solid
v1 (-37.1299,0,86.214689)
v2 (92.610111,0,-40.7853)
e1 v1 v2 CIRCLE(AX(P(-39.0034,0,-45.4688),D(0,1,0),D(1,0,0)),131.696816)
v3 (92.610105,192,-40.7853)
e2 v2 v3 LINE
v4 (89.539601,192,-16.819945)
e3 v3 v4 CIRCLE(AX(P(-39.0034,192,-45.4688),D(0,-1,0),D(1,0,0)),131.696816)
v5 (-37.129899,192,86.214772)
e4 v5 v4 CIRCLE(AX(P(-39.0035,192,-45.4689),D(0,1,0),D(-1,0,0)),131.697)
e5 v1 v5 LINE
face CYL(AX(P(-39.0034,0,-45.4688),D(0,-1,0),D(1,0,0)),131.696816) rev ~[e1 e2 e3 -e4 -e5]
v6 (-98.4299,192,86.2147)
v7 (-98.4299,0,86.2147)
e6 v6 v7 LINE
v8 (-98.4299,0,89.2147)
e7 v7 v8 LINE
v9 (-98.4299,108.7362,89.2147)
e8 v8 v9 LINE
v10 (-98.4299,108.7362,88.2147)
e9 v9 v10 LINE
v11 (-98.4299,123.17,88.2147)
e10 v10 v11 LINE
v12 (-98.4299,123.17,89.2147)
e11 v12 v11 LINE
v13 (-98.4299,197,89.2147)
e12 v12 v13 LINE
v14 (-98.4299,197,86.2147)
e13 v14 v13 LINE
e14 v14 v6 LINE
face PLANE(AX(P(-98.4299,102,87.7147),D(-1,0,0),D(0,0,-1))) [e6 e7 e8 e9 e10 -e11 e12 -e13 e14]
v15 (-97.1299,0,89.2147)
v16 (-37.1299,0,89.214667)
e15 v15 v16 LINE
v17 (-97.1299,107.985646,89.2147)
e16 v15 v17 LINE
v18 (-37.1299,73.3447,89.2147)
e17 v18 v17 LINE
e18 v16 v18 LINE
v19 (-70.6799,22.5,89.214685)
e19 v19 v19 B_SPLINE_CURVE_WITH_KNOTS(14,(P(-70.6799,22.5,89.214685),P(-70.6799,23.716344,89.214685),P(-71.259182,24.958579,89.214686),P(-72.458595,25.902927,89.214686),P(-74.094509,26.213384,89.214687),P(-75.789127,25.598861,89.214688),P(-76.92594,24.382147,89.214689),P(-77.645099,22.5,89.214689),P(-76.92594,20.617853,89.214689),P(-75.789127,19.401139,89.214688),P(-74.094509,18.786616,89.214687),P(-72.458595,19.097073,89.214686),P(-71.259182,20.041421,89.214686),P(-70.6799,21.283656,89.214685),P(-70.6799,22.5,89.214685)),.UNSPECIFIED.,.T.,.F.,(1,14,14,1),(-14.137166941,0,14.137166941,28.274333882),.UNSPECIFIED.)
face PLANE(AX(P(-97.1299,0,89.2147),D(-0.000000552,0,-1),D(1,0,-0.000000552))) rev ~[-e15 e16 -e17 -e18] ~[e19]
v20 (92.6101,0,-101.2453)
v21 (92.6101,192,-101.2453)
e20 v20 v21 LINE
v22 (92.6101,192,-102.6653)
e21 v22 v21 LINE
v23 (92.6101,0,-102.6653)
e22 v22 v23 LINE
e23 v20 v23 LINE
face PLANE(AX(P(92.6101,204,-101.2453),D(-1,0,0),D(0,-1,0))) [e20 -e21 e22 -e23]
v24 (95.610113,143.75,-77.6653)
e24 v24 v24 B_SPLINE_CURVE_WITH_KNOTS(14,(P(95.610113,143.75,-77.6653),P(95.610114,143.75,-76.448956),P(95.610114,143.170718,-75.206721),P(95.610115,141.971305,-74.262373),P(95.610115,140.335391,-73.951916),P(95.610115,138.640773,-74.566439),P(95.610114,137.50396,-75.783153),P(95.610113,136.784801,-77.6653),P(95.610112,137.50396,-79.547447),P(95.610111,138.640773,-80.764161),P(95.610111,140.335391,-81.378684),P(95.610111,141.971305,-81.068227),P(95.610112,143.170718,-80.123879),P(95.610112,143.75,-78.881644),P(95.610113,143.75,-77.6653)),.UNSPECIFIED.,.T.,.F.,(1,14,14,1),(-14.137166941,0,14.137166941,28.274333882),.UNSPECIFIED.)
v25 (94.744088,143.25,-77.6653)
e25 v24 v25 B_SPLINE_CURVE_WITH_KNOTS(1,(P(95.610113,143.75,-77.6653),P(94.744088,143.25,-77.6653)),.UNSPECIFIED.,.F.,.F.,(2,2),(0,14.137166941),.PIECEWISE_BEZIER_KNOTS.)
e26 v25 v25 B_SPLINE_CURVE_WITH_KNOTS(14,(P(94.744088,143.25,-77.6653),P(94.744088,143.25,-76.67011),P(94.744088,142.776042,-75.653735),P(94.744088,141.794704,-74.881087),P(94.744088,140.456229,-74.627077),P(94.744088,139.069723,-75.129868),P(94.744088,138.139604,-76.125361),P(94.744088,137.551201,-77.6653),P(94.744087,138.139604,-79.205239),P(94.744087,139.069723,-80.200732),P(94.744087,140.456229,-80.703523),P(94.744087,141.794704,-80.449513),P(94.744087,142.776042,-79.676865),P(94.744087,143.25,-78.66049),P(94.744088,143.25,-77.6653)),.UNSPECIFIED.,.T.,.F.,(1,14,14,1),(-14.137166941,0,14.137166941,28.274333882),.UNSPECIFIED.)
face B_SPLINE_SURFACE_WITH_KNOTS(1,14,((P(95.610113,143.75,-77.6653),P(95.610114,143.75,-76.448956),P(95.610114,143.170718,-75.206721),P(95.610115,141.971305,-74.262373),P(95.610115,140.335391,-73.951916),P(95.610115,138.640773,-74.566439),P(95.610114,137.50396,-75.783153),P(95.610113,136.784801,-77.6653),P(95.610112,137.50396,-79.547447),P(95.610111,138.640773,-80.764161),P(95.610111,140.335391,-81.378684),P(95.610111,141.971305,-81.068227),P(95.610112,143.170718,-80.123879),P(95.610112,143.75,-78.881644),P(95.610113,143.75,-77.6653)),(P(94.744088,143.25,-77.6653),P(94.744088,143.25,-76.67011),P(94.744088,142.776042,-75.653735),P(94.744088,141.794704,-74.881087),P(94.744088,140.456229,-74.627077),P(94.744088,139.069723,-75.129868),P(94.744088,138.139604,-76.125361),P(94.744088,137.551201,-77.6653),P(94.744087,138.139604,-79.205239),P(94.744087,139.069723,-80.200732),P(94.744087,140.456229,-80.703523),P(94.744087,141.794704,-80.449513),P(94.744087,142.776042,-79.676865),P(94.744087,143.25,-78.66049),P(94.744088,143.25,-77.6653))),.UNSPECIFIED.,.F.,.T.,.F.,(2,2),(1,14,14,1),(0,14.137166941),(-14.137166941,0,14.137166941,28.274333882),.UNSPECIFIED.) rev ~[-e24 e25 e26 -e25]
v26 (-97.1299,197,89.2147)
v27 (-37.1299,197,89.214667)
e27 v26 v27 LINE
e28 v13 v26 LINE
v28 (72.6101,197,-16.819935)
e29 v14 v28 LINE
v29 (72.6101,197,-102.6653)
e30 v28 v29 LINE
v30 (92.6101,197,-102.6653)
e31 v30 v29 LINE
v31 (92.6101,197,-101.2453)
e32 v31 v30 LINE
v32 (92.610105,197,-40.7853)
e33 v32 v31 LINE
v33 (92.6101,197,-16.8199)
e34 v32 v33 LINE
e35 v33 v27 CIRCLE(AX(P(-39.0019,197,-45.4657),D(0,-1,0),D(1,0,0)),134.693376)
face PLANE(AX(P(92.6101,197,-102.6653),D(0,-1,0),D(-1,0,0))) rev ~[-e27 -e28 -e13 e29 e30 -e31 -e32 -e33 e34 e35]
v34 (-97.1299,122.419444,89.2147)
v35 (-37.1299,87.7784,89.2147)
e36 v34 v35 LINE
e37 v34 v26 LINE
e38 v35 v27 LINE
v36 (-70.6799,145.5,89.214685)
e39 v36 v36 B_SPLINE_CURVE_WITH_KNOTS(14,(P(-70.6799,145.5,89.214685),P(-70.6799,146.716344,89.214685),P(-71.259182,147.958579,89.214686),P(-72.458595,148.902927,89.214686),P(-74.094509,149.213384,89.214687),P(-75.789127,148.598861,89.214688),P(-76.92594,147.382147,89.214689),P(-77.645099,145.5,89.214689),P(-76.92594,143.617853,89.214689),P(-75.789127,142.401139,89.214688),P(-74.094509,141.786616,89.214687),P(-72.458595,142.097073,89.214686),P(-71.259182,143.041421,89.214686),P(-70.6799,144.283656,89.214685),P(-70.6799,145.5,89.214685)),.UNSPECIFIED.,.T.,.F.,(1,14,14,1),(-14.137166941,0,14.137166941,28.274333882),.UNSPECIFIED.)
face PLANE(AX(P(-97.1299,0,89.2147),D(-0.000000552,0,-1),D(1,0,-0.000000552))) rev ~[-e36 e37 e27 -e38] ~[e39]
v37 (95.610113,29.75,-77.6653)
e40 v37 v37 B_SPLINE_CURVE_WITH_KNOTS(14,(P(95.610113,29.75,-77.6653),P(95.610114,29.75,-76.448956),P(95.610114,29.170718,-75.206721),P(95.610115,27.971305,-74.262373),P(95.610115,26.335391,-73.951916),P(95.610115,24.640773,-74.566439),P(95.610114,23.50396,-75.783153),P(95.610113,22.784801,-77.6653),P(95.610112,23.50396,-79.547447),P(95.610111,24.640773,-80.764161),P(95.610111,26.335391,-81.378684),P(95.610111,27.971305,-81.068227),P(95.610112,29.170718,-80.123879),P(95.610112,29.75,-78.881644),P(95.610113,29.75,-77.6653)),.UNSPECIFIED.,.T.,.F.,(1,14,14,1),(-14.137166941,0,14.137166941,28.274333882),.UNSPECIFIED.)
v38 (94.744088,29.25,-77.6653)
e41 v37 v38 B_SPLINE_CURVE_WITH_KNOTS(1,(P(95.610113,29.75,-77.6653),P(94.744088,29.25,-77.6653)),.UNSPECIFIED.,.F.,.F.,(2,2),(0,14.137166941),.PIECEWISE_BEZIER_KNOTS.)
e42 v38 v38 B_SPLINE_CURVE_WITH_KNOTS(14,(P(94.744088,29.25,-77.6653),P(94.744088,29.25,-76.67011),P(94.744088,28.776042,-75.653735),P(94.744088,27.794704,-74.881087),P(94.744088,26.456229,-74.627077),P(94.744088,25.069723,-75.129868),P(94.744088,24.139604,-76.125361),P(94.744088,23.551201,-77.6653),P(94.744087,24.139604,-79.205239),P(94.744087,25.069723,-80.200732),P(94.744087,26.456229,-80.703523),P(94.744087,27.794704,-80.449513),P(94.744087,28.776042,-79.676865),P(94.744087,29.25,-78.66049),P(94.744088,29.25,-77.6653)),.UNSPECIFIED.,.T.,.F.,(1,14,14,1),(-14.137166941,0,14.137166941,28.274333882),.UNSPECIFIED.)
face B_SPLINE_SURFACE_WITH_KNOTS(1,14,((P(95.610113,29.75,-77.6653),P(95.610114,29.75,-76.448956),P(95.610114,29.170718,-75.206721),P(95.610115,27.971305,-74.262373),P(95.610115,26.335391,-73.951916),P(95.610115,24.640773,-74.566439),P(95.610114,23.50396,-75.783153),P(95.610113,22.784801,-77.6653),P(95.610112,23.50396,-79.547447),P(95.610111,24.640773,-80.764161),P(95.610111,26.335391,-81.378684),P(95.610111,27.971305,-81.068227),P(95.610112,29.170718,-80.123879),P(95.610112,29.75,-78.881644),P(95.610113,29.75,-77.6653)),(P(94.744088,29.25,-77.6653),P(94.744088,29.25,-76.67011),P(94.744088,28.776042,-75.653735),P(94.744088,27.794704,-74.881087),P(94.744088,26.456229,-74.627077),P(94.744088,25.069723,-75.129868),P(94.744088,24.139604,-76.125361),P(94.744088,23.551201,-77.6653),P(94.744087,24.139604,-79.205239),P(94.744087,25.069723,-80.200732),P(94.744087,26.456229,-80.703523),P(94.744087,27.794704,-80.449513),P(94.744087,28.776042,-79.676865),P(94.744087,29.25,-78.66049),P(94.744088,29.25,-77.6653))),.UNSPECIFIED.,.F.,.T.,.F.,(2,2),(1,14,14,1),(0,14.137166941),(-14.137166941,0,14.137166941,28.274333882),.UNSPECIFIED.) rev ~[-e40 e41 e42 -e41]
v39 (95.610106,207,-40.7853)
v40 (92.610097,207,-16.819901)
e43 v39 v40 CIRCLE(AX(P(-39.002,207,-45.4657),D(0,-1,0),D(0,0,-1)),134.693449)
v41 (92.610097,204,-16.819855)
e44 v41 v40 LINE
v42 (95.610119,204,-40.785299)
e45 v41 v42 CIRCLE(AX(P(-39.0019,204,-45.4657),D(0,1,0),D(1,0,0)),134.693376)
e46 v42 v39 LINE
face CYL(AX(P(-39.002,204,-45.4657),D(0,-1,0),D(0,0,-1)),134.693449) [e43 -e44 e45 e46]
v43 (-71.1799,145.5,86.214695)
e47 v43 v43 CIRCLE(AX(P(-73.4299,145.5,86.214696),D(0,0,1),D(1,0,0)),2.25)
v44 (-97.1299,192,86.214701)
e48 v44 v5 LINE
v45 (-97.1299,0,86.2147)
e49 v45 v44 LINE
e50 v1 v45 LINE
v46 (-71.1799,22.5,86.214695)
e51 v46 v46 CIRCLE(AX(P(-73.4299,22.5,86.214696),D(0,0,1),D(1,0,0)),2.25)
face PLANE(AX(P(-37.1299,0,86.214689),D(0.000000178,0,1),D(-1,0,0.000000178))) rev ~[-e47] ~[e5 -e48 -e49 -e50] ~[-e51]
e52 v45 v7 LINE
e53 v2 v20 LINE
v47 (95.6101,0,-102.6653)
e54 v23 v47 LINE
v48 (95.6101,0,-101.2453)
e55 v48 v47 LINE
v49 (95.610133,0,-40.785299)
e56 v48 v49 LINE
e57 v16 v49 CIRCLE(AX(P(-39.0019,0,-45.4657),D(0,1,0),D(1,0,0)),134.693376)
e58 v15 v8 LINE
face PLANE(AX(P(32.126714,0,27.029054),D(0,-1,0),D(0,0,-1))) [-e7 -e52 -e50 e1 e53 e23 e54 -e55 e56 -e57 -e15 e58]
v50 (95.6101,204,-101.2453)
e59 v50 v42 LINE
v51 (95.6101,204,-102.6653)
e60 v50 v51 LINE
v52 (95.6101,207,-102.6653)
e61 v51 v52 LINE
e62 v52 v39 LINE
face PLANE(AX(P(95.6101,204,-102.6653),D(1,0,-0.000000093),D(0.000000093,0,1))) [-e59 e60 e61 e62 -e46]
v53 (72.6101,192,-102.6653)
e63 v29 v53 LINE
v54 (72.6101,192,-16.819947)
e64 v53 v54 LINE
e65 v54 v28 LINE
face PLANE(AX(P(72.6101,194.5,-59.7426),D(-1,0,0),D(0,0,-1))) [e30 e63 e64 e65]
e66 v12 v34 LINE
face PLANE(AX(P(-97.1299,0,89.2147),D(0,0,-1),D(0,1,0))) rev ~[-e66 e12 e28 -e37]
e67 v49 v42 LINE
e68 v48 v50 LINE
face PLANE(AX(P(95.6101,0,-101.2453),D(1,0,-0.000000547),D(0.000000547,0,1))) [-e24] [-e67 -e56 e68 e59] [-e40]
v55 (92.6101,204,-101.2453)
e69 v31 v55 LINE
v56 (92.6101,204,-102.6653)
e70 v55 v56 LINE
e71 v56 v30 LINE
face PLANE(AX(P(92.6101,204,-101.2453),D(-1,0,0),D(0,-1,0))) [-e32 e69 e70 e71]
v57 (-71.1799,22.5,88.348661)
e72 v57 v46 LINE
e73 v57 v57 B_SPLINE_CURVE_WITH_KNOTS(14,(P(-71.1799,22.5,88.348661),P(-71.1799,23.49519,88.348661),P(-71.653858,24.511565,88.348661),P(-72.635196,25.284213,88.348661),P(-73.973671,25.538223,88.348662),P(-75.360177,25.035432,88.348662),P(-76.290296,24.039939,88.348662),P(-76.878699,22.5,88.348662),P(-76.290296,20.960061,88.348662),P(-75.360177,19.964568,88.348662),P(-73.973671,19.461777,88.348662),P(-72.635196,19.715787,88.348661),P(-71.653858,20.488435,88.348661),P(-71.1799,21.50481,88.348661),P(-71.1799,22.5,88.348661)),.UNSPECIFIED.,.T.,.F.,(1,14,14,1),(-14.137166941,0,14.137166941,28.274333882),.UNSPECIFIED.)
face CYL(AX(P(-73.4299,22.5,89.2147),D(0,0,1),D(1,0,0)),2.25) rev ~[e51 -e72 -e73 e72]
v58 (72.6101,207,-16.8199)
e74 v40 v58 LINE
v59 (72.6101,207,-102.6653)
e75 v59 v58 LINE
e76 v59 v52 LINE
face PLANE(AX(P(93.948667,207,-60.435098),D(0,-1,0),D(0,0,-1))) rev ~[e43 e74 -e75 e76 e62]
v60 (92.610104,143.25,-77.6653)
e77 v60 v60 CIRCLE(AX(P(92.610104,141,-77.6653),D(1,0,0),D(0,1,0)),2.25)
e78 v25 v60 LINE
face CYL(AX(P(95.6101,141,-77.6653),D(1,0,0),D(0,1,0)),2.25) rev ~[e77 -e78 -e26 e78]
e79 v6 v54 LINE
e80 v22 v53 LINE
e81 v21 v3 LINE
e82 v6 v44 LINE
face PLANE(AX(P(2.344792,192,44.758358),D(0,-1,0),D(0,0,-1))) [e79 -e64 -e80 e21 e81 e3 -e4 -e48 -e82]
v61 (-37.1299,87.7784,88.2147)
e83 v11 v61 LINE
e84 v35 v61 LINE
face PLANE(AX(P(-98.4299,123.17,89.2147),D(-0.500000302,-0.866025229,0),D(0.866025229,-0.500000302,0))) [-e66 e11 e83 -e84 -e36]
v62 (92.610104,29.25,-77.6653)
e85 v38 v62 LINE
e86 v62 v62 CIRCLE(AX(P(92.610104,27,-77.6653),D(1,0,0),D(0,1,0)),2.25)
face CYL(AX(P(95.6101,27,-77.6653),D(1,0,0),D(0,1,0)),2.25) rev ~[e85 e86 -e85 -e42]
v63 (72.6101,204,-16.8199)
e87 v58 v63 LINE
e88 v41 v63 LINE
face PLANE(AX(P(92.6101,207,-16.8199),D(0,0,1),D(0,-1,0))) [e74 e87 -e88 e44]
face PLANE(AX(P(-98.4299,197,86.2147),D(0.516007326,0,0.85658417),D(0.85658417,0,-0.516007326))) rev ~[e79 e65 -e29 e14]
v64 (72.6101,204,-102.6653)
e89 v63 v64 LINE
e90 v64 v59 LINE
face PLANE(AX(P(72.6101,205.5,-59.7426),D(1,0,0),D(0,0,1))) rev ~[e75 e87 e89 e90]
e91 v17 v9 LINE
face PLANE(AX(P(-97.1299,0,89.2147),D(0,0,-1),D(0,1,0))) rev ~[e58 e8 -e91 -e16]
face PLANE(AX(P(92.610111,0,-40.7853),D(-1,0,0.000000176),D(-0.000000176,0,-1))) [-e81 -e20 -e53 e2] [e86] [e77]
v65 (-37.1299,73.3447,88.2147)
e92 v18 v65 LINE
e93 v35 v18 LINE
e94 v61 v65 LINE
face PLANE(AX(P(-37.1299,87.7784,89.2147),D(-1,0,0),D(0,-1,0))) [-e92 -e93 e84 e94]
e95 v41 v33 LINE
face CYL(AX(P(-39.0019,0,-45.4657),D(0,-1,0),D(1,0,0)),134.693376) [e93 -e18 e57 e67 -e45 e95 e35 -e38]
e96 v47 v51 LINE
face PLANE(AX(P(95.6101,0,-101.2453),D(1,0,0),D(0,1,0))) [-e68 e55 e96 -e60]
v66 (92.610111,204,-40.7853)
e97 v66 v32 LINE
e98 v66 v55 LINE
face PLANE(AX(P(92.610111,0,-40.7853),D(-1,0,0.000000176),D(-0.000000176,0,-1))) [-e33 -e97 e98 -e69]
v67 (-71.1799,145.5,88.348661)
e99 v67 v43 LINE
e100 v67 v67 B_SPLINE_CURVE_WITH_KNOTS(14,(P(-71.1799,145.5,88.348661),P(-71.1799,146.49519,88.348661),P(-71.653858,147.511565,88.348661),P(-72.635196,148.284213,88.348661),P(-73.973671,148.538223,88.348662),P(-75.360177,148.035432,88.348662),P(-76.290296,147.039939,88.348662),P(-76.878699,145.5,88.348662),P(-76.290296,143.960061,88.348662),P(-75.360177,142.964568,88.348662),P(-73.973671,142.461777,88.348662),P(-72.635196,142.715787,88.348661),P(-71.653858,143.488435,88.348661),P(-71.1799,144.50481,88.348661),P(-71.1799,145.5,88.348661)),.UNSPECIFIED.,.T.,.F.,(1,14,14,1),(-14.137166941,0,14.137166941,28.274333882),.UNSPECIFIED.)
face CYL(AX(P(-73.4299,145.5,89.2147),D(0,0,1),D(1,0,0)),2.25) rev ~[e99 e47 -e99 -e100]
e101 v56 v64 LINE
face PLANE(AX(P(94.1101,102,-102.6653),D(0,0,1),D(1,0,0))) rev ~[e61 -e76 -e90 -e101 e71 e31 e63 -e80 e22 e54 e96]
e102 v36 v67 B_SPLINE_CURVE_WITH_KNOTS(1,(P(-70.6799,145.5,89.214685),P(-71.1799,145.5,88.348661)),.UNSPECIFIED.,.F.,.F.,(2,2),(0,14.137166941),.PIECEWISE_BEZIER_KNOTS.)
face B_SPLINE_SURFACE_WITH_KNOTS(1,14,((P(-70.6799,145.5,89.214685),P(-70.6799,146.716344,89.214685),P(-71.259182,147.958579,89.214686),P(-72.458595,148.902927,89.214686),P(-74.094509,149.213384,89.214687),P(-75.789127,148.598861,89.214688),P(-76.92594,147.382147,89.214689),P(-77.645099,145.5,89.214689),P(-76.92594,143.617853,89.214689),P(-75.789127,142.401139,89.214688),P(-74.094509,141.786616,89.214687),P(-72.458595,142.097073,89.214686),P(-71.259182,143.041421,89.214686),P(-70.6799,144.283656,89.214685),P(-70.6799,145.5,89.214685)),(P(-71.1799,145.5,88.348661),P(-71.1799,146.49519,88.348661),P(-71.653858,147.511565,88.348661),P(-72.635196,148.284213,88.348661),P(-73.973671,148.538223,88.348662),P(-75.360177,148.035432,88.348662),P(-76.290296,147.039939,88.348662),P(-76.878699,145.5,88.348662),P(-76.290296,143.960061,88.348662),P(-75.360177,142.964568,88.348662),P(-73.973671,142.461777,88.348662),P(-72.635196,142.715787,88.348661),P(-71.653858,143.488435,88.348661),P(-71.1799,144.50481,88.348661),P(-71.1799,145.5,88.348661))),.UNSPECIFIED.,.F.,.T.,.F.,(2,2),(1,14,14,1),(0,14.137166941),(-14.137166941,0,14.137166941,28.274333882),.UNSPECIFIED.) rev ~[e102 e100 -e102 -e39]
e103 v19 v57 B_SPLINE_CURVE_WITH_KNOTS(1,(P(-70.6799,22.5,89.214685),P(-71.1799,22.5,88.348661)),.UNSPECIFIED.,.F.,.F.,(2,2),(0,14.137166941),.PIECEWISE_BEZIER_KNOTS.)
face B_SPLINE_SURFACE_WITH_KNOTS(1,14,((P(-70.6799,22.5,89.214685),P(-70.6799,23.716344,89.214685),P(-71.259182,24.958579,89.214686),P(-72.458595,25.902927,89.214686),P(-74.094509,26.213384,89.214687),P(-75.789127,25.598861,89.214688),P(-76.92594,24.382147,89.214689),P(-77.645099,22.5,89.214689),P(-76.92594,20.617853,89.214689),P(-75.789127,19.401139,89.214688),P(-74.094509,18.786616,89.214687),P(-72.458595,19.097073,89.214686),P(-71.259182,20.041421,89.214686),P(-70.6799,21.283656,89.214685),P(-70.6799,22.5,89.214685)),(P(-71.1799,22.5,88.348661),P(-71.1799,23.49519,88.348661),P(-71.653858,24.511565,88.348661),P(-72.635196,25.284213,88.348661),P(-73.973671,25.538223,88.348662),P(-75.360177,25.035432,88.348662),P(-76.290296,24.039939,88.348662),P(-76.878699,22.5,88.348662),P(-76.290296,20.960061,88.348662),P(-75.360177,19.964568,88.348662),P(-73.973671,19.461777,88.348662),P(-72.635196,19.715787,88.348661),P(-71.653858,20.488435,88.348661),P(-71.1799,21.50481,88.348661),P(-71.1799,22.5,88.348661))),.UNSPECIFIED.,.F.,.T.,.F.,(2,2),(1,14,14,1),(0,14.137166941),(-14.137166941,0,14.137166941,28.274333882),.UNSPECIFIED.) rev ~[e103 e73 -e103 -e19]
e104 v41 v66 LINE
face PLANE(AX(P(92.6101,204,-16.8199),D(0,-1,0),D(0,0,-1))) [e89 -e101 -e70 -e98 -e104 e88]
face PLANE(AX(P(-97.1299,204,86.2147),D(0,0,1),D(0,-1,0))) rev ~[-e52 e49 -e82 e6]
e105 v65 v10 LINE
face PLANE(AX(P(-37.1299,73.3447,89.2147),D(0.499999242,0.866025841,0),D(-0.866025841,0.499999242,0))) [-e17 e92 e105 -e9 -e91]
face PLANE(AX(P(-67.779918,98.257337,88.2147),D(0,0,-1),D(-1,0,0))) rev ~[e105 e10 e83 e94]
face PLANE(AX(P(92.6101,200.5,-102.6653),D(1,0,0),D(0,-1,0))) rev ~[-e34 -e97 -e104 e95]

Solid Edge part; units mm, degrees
sketch "Sketch1" plane through (0, 0, 0) normal (0, -1, 0) x (1, 0, 0)
  arc A0 (-37.1299, 86.2147) -> (92.6101, -40.7853) centre (-39.0034, -45.4688) cw
  line L0 (92.6101, -40.7853) -> (92.6101, -101.2453)
  line L1 (92.6101, -101.2453) -> (95.6101, -101.2453)
  line L2 (95.6101, -101.2453) -> (95.6101, -40.7853)
  arc A1 (-37.1299, 89.2147) -> (95.6101, -40.7853) centre (-39.0019, -45.4657) cw
  line L3 (-97.1299, 89.2147) -> (-37.1299, 89.2147)
  line L4 (-97.1299, 86.2147) -> (-97.1299, 89.2147)
  line L5 (-37.1299, 86.2147) -> (-97.1299, 86.2147)
  dimension "D1" = 129.74
  dimension "D2" = 127
  dimension "D3" = 60
  dimension "D4" = 60.46
  dimension "D5" = 3
  dimension "D6" = 3
  dimension "D7" = 3
extrude "Protrusion1" add sketch "Sketch1" against normal blind 204
sketch "Sketch2" plane through (-67.1299, 85, 89.2147) normal (0, 0, 1) x (1, 0, 0)
  circle A0 centre (-6.3, -62.5) radius 2.25
  circle A1 centre (-6.3, 60.5) radius 2.25
  dimension "D1" = 23.7
  dimension "D2" = 4.5
  dimension "D3" = 123
  dimension "D4" = 22.5
extrude "Cutout1" cut sketch "Sketch2" against normal through all
sketch "Sketch3" plane through (95.6101, 85, -66.0153) normal (1, 0, 0) x (0, 1, 0)
  circle A0 centre (56, -11.65) radius 2.25
  circle A1 centre (-58, -11.65) radius 2.25
  dimension "D1" = 114
  dimension "D2" = 4.5
  dimension "D3" = 4.5
  dimension "D4" = 23.58
  dimension "D5" = 75
extrude "Cutout2" cut sketch "Sketch3" against normal through all
sketch "Sketch4" plane through (-97.1299, 102, 87.7147) normal (-1, 0, 0) x (0, -1, 0)
  line L0 (-102, -1.5) -> (102, -1.5)
  line L1 (102, -1.5) -> (102, 1.5)
  line L2 (102, 1.5) -> (-102, 1.5)
  line L3 (-102, 1.5) -> (-102, -1.5)
extrude "Extrusionsausprägung_3" add sketch "Sketch4" along normal blind 1.3
sketch "Sketch5" plane through (94.1101, 102, -101.2453) normal (0, 0, -1) x (0, 1, 0)
  line L0 (-102, 1.5) -> (102, 1.5)
  line L1 (102, 1.5) -> (102, -1.5)
  line L2 (102, -1.5) -> (-102, -1.5)
  line L3 (-102, -1.5) -> (-102, 1.5)
extrude "Extrusionsausprägung_4" add sketch "Sketch5" along normal blind 1.42
sketch "Sketch6" plane through (-67.7799, 102, 89.2147) normal (0, 0, 1) x (0, 1, 0)
  line L0 (21.17, 30.65) -> (-14.2216, -30.65)
  line L1 (-14.2216, -30.65) -> (-28.6553, -30.65)
  line L2 (-28.6553, -30.65) -> (6.7362, 30.65)
  line L3 (6.7362, 30.65) -> (21.17, 30.65)
  dimension "D1" = 12.5
  dimension "D2" = 80.83
extrude "Cutout3" cut sketch "Sketch6" against normal blind 1
chamfer "Fase_1" distance 0.5 angle 60 4 edges at (-75.6799, 22.5, 89.2147) (-75.6799, 145.5, 89.2147) (95.6101, 24.75, -77.6653) (95.6101, 138.75, -77.6653) measured on face at (-87.7299, 88.9082, 89.2147) measured on face at (-87.7299, 183.4675, 89.2147) measured on face at (-87.7299, 88.9082, 89.2147) measured on face at (-87.7299, 183.4675, 89.2147) measured on face at (95.6101, 167.96, -91.7732)
sketch "Sketch7" plane through (-67.7799, 145.8892, 89.2147) normal (0, 0, 1) x (-1, 0, 0)
  line L0 (30.65, -58.1108) -> (-160.39, -58.1108)
  line L1 (-160.39, -58.1108) -> (-160.39, -53.1108)
  line L2 (-160.39, -53.1108) -> (30.65, -53.1108)
  line L3 (30.65, -53.1108) -> (30.65, -58.1108)
  dimension "D1" = 5
  dimension "D2" = 191.04
extrude "Cutout4" cut sketch "Sketch7" against normal up to next
sketch "Sketch8" plane through (94.1101, 204, -59.7426) normal (0, 1, 0) x (0, 0, -1)
  line L0 (-42.9227, 1.5) -> (42.9227, 1.5)
  line L1 (42.9227, 1.5) -> (42.9227, -1.5)
  line L2 (42.9227, -1.5) -> (-18.9573, -1.5)
  arc A0 (-18.9573, -1.5) -> (-42.9227, 1.5) centre (-14.2769, 133.1121) cw
extrude "Extrusionsausprägung_7" add sketch "Sketch8" along normal blind 3
sketch "Sketch9" plane through (92.6101, 103.5, -59.7426) normal (-1, 0, 0) x (0, -1, 0)
  line L0 (-88.5, 42.9227) -> (-93.5, 42.9227)
  line L1 (-93.5, 42.9227) -> (-93.5, -42.9227)
  line L2 (-93.5, -42.9227) -> (-88.5, -42.9227)
  line L3 (-88.5, -42.9227) -> (-88.5, 42.9227)
  line L4 (-103.5, 42.9227) -> (-100.5, 42.9227)
  line L5 (-100.5, 42.9227) -> (-100.5, -42.9227)
  line L6 (-100.5, -42.9227) -> (-103.5, -42.9227)
  line L7 (-103.5, -42.9227) -> (-103.5, 42.9227)
  dimension "D1" = 3
  dimension "D2" = 5
  dimension "D3" = 7
  dimension "D4" = 85.8453
extrude "Extrusionsausprägung_8" add sketch "Sketch9" along normal blind 20
sketch "Sketch10" plane through (84.1101, 103.5, -102.6653) normal (0, 0, -1) x (0, 1, 0)
  line L0 (93.5, 8.5) -> (93.5, -182.54)
  line L1 (93.5, -182.54) -> (97, -182.54)
  line L2 (97, -182.54) -> (97, 8.5)
  line L3 (97, 8.5) -> (93.5, 8.5)
extrude "Cutout5" cut sketch "Sketch10" against normal up to next
sketch "Sketch11" plane through (-2.9099, 197, -6.7253) normal (0, 1, 0) x (-1, 0, 0)
  line L0 (95.52, 92.94) -> (-75.52, -10.0947)
  line L1 (-92.4495, -10.0947) -> (-75.52, -10.0947)
  arc A0 (34.22, 92.94) -> (-92.4495, -10.0947) centre (36.0936, -38.7436) ccw
  line L2 (95.52, 92.94) -> (34.22, 92.94)
extrude "Protrusion2" add sketch "Sketch11" against normal up to vertex (5 mm away)
properties material "Nylon, allgemein"
